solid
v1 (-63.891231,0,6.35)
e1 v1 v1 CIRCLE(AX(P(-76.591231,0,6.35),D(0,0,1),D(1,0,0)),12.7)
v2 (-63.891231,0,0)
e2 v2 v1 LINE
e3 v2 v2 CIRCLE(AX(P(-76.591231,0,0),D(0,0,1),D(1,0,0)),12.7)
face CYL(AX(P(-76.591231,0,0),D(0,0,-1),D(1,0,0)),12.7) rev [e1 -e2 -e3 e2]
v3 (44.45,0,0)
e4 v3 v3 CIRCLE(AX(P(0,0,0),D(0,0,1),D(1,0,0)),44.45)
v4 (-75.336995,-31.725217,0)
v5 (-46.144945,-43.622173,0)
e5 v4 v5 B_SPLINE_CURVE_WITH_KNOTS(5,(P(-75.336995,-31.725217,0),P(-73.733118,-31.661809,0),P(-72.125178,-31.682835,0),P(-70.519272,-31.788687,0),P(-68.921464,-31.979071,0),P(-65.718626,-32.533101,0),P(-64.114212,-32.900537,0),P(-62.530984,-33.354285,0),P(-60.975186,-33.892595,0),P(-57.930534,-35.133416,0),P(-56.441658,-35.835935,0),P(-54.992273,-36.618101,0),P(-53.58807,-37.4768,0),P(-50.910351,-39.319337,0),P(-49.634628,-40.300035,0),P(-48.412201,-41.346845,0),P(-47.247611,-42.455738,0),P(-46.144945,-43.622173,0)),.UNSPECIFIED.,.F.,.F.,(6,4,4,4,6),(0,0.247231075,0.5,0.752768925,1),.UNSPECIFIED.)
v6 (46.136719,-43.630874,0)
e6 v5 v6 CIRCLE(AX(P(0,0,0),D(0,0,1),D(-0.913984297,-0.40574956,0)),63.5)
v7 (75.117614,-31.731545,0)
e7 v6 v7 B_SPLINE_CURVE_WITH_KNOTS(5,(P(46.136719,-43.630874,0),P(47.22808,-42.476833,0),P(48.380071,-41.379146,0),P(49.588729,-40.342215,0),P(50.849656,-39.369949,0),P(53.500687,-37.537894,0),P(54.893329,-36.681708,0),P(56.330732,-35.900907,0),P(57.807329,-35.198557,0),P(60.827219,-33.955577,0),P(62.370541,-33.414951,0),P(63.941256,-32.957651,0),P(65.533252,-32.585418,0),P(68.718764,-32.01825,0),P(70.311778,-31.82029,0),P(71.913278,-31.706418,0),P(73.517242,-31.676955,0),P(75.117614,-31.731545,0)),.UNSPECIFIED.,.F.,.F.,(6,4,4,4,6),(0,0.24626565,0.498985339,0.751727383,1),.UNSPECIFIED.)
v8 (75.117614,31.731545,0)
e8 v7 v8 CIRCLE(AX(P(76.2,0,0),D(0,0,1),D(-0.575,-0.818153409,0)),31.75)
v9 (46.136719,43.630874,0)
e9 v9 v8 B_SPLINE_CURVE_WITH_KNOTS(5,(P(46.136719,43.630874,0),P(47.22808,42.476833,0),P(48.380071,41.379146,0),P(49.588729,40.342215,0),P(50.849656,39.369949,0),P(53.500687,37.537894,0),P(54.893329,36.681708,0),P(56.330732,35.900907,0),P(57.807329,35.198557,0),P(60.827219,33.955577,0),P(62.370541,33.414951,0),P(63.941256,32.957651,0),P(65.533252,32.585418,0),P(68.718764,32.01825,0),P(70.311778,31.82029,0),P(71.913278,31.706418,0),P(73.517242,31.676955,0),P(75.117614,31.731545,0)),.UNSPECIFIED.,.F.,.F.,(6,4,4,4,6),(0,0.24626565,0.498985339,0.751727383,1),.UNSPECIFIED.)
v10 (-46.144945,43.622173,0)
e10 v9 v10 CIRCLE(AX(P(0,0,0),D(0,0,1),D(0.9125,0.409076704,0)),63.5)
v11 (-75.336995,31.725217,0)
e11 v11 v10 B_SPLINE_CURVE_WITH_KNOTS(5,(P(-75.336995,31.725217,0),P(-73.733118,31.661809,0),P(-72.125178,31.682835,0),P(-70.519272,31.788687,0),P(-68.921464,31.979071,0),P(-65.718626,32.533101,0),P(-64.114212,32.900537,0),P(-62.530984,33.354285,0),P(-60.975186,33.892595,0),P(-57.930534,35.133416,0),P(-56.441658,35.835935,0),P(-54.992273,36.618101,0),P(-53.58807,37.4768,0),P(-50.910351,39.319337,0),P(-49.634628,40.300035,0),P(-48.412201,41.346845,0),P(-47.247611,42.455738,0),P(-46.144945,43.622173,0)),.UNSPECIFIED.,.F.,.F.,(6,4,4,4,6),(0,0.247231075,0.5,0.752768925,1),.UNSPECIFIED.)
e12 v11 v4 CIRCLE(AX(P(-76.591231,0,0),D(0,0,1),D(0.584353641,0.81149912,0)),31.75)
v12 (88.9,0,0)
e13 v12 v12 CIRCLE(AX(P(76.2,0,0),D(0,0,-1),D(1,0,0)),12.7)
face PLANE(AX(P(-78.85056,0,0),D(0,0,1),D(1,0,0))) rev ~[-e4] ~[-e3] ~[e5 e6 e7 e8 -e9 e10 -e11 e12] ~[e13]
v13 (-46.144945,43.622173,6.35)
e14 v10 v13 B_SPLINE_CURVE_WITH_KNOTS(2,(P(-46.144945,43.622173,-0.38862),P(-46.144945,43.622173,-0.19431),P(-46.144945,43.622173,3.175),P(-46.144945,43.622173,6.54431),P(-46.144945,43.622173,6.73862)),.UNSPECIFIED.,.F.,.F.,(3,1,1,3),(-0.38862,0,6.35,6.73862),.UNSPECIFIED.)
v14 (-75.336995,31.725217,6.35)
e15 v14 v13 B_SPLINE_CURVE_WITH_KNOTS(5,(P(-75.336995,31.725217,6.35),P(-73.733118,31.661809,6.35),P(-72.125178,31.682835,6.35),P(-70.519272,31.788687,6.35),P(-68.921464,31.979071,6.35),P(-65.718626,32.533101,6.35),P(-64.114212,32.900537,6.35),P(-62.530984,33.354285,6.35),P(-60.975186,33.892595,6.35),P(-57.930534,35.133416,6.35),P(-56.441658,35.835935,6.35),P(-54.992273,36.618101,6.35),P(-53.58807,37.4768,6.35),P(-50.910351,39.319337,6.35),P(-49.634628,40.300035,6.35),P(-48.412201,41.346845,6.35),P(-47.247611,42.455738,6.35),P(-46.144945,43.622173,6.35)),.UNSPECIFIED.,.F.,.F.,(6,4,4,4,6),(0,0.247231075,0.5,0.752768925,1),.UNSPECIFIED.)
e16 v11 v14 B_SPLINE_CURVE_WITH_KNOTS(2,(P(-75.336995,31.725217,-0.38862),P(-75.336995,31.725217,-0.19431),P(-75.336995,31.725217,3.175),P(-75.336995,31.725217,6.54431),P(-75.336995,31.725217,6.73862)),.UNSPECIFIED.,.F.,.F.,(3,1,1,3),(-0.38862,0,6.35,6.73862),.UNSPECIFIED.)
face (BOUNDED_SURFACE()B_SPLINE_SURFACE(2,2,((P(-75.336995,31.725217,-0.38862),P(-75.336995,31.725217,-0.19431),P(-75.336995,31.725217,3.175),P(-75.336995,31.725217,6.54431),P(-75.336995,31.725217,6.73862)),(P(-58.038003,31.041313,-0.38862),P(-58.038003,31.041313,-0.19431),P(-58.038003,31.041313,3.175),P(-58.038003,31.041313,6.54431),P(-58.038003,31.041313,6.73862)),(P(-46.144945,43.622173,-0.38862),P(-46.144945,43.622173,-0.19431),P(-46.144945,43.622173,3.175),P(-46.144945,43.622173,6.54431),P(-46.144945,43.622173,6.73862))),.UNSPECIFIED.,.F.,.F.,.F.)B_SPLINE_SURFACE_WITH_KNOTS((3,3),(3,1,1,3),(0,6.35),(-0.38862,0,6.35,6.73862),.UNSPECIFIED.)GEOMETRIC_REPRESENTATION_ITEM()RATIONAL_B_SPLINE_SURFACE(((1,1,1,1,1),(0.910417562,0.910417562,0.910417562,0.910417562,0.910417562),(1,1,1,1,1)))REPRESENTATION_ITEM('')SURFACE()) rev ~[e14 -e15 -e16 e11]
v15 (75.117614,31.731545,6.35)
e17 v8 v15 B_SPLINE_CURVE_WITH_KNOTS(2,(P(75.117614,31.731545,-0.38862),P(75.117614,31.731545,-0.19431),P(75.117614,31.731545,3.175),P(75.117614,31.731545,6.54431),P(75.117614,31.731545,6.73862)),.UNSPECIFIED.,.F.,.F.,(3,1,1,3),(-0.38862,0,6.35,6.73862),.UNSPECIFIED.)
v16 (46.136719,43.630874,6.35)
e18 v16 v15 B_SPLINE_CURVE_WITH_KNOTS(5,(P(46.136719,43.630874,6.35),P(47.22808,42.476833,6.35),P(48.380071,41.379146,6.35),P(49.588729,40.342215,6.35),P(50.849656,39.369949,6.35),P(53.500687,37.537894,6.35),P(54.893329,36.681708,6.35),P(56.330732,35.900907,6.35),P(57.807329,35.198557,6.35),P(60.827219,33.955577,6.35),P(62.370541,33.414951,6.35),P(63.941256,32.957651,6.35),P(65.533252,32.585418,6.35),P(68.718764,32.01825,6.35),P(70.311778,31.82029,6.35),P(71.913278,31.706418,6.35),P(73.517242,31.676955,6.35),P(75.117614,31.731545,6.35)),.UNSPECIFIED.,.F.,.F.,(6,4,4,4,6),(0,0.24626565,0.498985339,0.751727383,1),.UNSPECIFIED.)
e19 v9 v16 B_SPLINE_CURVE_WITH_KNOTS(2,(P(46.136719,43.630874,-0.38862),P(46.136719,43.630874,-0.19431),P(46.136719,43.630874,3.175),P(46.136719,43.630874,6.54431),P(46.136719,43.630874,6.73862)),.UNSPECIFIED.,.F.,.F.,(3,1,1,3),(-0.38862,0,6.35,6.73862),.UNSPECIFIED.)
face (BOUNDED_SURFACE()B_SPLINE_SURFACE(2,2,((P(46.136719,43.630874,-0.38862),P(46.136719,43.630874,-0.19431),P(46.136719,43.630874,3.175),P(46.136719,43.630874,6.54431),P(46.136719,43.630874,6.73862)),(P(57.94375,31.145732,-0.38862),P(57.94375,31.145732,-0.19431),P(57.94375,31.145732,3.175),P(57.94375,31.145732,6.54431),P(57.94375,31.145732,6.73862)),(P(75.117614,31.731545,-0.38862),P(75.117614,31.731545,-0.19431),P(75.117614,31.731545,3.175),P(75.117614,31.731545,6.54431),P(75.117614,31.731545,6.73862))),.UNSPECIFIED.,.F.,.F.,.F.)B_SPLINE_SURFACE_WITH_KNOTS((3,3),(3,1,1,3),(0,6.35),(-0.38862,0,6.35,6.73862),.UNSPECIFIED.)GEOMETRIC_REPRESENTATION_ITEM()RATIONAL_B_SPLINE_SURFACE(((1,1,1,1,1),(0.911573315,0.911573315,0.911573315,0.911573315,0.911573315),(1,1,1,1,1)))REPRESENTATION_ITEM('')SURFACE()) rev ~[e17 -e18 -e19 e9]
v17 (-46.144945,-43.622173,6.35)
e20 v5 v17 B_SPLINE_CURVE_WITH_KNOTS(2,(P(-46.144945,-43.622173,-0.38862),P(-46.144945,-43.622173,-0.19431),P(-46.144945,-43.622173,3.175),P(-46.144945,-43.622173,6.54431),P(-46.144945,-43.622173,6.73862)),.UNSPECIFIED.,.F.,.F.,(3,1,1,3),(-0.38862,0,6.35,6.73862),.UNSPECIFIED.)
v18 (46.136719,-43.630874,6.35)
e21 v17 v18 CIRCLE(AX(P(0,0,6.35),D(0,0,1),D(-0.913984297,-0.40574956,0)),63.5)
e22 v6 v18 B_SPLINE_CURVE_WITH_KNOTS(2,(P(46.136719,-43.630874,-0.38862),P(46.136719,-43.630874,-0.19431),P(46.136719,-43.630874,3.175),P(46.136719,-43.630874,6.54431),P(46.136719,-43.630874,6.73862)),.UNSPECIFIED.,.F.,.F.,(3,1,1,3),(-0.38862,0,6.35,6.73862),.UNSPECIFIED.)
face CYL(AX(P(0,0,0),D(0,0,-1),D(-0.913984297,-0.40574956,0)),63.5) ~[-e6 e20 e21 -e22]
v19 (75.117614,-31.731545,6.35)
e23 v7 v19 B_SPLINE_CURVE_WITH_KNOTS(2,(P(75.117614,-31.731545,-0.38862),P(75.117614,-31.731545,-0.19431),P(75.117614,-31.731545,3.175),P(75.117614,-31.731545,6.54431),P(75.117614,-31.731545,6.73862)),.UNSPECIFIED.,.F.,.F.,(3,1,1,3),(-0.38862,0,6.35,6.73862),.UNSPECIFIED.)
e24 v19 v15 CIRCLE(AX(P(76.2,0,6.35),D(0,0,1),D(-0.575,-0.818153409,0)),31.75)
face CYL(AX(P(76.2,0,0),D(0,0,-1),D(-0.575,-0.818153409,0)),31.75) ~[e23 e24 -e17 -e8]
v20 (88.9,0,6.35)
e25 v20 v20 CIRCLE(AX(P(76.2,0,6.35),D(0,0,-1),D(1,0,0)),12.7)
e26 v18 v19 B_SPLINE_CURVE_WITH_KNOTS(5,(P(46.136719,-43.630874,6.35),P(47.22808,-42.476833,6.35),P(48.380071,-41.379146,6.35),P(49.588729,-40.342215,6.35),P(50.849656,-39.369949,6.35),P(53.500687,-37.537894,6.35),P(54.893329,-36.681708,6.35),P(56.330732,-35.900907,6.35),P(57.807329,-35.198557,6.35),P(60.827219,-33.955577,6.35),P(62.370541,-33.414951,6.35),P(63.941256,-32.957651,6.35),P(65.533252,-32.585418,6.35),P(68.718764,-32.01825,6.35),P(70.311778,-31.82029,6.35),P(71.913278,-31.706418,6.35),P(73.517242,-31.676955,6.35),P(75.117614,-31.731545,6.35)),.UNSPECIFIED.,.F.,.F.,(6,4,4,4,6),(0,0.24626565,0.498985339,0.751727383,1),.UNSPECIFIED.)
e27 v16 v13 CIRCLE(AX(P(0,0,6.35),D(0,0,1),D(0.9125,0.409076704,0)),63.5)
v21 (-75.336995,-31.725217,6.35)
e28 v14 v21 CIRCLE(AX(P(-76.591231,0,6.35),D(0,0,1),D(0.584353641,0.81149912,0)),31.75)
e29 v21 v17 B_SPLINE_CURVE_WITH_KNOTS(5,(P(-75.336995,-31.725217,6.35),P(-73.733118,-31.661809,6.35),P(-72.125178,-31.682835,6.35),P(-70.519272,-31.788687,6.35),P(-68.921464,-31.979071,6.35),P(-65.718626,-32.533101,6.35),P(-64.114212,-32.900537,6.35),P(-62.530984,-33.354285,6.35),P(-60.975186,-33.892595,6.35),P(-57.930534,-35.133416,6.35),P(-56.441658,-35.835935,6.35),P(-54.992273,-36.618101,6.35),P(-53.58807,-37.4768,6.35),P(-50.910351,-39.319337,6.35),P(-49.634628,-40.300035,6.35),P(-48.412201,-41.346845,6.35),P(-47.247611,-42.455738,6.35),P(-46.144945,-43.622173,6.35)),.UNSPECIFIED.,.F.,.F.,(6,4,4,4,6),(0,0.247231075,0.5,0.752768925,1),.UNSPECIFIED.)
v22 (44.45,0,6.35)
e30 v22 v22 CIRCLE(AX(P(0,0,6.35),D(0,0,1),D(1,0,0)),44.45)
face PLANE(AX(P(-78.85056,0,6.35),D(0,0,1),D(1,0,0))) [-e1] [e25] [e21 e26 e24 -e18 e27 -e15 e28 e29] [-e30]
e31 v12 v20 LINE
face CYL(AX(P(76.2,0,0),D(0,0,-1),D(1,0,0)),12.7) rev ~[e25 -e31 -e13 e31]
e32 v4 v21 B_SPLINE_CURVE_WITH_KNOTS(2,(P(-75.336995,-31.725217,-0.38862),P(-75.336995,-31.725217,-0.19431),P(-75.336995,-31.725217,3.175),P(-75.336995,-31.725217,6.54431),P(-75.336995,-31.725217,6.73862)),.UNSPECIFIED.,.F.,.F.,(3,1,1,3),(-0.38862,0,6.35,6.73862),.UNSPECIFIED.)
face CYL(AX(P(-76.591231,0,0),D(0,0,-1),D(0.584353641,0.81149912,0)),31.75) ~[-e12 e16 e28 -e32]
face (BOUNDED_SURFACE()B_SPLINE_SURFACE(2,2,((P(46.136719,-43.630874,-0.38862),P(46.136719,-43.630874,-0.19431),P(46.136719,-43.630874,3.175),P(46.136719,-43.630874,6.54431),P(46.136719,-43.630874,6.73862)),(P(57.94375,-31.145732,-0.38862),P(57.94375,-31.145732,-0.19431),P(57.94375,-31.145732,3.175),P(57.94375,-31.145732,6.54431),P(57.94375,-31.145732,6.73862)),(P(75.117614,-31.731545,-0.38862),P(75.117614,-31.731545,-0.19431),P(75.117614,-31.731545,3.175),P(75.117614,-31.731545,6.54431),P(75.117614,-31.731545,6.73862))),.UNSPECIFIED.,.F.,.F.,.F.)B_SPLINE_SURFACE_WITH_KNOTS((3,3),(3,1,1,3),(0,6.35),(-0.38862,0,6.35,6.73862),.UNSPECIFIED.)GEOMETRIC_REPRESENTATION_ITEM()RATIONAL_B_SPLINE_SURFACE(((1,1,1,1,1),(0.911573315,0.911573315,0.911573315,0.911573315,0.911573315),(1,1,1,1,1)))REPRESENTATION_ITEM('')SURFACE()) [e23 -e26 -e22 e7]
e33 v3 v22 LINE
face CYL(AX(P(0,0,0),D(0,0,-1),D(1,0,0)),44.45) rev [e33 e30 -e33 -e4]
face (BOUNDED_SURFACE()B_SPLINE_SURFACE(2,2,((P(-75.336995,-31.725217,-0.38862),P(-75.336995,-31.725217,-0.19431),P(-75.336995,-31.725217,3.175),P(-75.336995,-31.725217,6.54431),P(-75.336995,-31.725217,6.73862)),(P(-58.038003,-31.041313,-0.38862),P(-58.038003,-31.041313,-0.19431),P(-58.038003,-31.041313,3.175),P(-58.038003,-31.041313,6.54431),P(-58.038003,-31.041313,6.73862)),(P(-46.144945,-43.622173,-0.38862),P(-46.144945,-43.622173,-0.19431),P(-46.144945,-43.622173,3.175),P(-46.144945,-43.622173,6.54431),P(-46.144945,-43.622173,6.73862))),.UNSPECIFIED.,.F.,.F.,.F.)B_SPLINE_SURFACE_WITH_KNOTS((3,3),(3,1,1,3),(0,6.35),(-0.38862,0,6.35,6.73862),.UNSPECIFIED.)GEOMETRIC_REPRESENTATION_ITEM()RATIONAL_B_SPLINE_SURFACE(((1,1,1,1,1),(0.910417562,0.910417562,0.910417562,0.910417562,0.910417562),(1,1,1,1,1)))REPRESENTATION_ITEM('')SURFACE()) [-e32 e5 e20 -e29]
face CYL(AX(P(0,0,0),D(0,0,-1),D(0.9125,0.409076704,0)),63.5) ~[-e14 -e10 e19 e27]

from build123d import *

# Parameters (mm, degrees)
F0_R     = 12.7
F0_R_2   = 44.45
F1_DEPTH = 6.35
F2_R     = 38.1


with BuildPart() as f1:
    # F0 (on Top) → F1 (new body)
    with BuildSketch(Plane.XY):
        with BuildLine():
            ThreePointArc((-58.0380028326, -25.7650970735), (-63.5, 0), (-58.0380028326, 25.7650970735))
            ThreePointArc((-58.0380028326, 25.7650970735), (-108.3412309289, 0), (-58.0380028326, -25.7650970735))
        make_face()
        with Locations((-76.5912309289, 0)):
            Circle(F0_R, mode=Mode.SUBTRACT)
        with BuildLine():
            ThreePointArc((57.94375, -25.976370723), (62.0954029096, -13.2819779212), (63.5, 0))
            ThreePointArc((63.5, 0), (62.0954029096, 13.2819779212), (57.94375, 25.976370723))
            ThreePointArc((57.94375, 25.976370723), (-0.1156721136, 63.4998946453), (-58.0380028326, 25.7650970735))
            ThreePointArc((-58.0380028326, 25.7650970735), (-63.5, 0), (-58.0380028326, -25.7650970735))
            ThreePointArc((-58.0380028326, -25.7650970735), (-0.1156721136, -63.4998946453), (57.94375, -25.976370723))
        make_face()
        Circle(F0_R_2, mode=Mode.SUBTRACT)
        with BuildLine():
            ThreePointArc((57.94375, 25.976370723), (62.0954029096, 13.2819779212), (63.5, 0))
            ThreePointArc((63.5, 0), (62.0954029096, -13.2819779212), (57.94375, -25.976370723))
            ThreePointArc((57.94375, -25.976370723), (107.95, 0), (57.94375, 25.976370723))
        make_face()
        with BuildLine():
            ThreePointArc((63.5, 0), (76.2, 12.7), (88.9, 0))
            ThreePointArc((88.9, 0), (76.2, -12.7), (63.5, 0))
        make_face(mode=Mode.SUBTRACT)
    extrude(amount=F1_DEPTH)

    # F2
    f2_edges = [f1.edges().sort_by_distance(p)[0] for p in [
        (-58.038003, 25.765097, 3.175),
        (57.94375, -25.976371, 3.175),
        (-58.038003, -25.765097, 3.175),
        (57.94375, 25.976371, 3.175),
    ]]
    fillet(f2_edges, radius=F2_R)


solid = f1.part
